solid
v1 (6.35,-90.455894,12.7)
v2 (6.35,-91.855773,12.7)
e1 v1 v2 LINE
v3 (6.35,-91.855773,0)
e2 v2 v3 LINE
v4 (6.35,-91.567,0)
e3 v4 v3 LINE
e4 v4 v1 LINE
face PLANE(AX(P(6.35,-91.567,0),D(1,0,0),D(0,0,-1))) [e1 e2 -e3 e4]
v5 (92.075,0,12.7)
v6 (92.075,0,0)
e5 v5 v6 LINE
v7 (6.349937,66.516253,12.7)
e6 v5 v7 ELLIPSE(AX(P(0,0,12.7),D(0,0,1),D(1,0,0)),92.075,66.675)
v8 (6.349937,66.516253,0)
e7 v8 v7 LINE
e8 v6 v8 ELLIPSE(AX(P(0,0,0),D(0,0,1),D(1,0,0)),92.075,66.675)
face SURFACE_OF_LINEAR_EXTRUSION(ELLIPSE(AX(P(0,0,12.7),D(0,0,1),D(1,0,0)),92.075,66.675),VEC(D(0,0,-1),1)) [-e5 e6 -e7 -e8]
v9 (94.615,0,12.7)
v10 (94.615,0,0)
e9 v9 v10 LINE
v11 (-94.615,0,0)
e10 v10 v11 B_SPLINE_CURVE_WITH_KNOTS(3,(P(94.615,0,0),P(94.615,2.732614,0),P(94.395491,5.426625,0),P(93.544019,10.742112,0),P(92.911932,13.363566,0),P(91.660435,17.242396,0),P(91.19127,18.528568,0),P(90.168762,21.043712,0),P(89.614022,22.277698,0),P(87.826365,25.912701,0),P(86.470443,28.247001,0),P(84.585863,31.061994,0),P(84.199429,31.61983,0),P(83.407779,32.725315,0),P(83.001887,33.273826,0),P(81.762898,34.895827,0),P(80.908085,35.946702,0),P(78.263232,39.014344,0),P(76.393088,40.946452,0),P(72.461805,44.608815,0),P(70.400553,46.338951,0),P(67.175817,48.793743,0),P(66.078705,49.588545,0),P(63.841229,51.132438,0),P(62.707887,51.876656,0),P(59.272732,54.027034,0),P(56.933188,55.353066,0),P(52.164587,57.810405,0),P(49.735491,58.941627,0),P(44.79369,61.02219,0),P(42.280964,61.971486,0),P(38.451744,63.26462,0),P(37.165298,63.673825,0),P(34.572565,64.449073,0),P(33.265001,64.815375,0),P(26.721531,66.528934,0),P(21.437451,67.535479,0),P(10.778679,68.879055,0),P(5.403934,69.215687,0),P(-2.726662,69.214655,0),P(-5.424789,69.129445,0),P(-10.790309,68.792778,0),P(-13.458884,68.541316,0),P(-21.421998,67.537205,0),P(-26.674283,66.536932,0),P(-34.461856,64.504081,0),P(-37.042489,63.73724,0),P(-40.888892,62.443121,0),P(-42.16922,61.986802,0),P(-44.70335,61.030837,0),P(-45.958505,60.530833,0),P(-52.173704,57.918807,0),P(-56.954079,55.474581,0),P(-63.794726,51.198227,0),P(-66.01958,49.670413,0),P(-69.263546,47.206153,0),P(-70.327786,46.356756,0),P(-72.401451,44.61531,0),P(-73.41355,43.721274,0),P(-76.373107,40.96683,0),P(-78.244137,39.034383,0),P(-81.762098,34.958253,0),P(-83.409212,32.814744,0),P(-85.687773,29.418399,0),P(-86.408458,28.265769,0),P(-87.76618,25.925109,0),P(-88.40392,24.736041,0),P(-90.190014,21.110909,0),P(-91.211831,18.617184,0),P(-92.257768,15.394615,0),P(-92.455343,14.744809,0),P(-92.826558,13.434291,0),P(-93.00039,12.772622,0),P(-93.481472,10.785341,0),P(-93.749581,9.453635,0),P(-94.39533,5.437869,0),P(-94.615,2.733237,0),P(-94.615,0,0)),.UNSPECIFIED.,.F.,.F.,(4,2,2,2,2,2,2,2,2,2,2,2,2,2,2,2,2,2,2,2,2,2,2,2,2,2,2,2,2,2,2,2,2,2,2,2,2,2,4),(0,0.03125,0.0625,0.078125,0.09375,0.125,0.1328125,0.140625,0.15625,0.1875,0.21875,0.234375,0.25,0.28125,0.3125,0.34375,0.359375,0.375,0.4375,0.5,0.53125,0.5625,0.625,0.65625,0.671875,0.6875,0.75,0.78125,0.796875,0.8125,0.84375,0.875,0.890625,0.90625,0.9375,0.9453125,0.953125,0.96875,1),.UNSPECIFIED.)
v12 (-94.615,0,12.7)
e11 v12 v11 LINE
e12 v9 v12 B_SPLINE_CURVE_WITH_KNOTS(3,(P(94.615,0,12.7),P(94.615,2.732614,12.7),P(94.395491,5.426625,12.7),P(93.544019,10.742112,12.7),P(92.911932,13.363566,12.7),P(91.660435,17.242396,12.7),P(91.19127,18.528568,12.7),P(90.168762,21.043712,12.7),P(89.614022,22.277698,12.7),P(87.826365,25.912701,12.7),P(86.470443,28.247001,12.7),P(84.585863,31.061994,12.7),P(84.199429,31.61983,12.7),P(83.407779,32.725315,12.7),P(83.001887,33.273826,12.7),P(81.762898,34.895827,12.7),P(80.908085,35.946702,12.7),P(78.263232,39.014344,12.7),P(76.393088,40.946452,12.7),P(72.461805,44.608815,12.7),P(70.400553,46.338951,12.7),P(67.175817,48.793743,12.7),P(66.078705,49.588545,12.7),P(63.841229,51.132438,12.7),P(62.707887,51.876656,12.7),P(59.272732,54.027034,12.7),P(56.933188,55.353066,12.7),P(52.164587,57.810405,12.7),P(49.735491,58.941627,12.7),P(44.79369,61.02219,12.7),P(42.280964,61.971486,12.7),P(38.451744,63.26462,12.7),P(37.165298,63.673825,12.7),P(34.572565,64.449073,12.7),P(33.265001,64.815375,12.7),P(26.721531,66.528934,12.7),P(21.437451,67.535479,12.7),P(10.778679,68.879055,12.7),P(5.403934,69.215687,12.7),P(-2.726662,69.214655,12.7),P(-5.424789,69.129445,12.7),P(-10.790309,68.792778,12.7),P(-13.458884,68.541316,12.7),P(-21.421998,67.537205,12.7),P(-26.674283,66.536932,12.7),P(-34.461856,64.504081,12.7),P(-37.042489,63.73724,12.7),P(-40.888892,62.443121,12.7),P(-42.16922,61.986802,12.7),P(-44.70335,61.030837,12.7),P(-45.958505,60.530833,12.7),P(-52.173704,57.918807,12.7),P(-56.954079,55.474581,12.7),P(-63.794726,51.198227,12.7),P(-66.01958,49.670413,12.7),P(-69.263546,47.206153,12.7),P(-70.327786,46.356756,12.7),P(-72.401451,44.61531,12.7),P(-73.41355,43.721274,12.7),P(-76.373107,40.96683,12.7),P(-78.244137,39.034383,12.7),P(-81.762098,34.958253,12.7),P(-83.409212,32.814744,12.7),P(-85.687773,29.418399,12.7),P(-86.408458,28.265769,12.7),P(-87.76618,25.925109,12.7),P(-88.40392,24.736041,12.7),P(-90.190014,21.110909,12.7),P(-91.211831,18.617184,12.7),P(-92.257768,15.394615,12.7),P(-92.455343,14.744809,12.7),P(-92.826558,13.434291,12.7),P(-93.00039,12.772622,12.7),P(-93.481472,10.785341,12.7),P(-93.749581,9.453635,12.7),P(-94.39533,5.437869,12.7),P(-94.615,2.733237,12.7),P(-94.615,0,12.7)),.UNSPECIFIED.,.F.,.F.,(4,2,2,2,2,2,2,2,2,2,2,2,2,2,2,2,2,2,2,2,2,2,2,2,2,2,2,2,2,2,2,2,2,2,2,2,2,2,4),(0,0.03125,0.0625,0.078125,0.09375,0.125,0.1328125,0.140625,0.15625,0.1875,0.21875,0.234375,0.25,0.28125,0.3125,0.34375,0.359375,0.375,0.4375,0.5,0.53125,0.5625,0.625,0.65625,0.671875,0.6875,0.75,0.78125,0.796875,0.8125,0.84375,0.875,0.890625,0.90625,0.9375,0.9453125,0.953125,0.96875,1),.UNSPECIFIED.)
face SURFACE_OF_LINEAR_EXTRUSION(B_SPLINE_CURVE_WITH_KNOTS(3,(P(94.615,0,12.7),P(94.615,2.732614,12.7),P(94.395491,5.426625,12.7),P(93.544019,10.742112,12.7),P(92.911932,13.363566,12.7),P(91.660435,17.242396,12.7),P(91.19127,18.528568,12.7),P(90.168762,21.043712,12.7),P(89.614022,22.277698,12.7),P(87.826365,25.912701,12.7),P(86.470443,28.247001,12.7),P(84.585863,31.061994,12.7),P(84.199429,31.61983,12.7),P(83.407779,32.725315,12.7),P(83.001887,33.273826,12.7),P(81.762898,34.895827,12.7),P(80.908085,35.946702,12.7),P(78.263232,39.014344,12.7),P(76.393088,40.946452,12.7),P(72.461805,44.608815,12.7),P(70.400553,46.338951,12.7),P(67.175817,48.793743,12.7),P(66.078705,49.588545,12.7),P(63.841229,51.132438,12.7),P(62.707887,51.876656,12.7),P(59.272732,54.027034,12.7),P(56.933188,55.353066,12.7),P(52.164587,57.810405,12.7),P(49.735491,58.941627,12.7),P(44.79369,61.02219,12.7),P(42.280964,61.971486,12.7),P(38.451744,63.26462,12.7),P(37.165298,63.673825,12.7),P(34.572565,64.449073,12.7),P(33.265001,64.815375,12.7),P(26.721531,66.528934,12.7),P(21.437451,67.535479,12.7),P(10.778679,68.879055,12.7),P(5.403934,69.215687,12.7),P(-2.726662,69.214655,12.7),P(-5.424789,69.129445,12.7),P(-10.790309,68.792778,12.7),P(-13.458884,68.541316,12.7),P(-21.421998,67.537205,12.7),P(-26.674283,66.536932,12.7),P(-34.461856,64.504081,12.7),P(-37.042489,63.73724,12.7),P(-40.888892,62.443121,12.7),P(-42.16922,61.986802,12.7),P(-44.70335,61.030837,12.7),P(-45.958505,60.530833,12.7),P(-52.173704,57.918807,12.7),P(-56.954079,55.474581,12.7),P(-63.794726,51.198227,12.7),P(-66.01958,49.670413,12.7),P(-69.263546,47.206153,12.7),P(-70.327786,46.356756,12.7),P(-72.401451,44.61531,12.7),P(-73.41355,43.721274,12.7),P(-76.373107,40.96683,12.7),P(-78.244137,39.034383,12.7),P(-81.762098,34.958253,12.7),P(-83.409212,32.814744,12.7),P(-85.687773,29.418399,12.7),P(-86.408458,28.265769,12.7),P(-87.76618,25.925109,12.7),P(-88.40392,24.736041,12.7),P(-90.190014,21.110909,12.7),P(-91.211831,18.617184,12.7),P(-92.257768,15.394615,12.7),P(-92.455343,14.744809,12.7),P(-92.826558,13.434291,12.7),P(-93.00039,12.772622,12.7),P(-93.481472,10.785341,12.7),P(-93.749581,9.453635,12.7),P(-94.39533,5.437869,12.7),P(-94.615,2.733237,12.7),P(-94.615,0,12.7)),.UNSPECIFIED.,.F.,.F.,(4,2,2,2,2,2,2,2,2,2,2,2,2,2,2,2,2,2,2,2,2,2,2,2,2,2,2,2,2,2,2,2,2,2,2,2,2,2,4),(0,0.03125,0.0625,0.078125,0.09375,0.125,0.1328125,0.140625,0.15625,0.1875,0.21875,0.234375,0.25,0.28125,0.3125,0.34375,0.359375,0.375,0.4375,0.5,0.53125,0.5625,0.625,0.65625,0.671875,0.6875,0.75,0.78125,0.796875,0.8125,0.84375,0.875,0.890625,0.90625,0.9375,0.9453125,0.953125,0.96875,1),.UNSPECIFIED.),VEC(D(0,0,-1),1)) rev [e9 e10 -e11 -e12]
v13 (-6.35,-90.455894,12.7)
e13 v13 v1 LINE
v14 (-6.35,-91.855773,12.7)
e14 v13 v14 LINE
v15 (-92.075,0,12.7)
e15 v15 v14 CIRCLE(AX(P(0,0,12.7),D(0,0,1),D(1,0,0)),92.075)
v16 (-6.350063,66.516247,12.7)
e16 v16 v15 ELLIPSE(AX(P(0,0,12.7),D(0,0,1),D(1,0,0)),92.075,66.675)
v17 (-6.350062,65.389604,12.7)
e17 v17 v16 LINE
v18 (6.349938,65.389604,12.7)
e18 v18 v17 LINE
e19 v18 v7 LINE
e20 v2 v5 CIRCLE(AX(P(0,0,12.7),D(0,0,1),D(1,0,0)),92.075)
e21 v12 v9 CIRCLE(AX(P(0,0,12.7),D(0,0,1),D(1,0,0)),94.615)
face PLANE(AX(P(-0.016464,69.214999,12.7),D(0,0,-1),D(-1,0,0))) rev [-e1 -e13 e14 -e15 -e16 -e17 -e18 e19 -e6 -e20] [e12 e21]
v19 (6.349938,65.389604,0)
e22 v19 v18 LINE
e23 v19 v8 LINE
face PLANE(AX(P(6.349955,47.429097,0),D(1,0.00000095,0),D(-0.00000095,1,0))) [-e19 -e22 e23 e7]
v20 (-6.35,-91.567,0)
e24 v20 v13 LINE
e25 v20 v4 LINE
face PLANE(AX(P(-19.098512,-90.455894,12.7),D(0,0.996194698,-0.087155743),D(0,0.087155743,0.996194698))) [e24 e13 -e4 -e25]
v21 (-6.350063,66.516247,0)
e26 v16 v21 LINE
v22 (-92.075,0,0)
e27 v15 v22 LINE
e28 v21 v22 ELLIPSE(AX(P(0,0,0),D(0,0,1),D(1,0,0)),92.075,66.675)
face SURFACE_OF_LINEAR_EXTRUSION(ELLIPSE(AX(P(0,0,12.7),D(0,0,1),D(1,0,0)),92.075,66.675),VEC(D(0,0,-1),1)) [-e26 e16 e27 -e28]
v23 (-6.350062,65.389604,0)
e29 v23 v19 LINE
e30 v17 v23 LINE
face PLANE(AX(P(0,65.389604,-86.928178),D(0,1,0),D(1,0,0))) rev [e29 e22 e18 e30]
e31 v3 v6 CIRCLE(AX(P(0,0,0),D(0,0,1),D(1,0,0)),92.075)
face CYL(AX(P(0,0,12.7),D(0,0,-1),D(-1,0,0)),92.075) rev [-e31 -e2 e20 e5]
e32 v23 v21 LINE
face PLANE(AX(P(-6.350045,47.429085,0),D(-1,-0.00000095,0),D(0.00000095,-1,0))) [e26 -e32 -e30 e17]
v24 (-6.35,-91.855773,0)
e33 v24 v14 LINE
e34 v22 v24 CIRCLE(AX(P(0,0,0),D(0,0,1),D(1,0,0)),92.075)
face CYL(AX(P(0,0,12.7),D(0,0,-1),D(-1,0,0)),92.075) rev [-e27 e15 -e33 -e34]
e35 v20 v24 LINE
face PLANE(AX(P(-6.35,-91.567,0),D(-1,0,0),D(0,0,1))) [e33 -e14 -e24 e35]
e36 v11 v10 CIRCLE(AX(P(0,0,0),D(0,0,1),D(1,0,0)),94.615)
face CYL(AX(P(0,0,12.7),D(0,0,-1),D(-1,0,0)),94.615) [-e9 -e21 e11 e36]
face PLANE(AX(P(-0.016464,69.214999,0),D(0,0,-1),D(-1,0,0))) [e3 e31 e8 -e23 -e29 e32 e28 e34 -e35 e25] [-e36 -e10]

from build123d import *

# Parameters (mm, degrees)
EXTRUDE_THIN4_DEPTH  = 12.7
BOSS_EXTRUDE4_START  = -1.285403
SKETCH9_W            = 12.7
SKETCH9_H            = 12.7
BOSS_EXTRUDE4_DEPTH  = 1.285403
SKETCH18_W           = 12.7
SKETCH18_H           = 12.7
BOSS_EXTRUDE11_DEPTH = 0.508
BOSS_EXTRUDE12_DEPTH = 12.7


# Read off the part's stored shape, not the designer's step: Extrude-Thin4
with BuildPart() as part:
    # Extrude-Thin4 outline → Extrude-Thin4 (new body)
    with BuildSketch(Plane.XY):
        with BuildLine():
            ThreePointArc((-94.615, 0), (0, -94.615), (94.615, 0))
            add(Edge.make_bspline(
                [(94.615, 0), (94.615, 2.73261432), (94.395490525, 5.426625193), (93.54401895, 10.742112058), (92.911931877, 13.363566074), (91.660435042, 17.242396406), (91.191270419, 18.528568166), (90.168762341, 21.043712381), (89.614022449, 22.277697693), (87.826365425, 25.912701016), (86.470442882, 28.247000696), (84.585863218, 31.06199447), (84.199428542, 31.619830243), (83.407778518, 32.725315123), (83.001887397, 33.273825859), (81.762898011, 34.895827175), (80.90808464, 35.946702496), (78.263231539, 39.014343992), (76.393087657, 40.946452093), (72.461804782, 44.60881511), (70.400552775, 46.338950587), (67.175816993, 48.793743065), (66.078704621, 49.588544685), (63.841229223, 51.13243847), (62.707886547, 51.876655554), (59.272732326, 54.027034208), (56.933188029, 55.353065789), (52.164586894, 57.810404839), (49.735490844, 58.941627007), (44.793689995, 61.022190247), (42.280964323, 61.97148591), (38.451744208, 63.264620094), (37.165298005, 63.673825065), (34.572564534, 64.449073075), (33.26500114, 64.81537478), (26.721531086, 66.528934319), (21.437450815, 67.535478954), (10.778679303, 68.879054675), (5.403934101, 69.215687043), (-2.726662378, 69.214654911), (-5.424789063, 69.129445108), (-10.790309058, 68.792778457), (-13.458884287, 68.541316332), (-21.421997842, 67.537204644), (-26.674282833, 66.536932479), (-34.461856375, 64.504081304), (-37.042489287, 63.737239618), (-40.888891672, 62.443121275), (-42.169219974, 61.986801748), (-44.70335009, 61.030836829), (-45.958505365, 60.530833267), (-52.173703529, 57.918806786), (-56.954079496, 55.474581033), (-63.79472601, 51.198227458), (-66.019580064, 49.670413346), (-69.263545781, 47.206152749), (-70.327786152, 46.356755825), (-72.401450601, 44.615309625), (-73.413550097, 43.721273672), (-76.37310693, 40.9668298), (-78.244137425, 39.034382611), (-81.76209758, 34.95825275), (-83.409211697, 32.814743947), (-85.687772675, 29.418399352), (-86.408457843, 28.265769226), (-87.766179903, 25.925109257), (-88.403920063, 24.736041385), (-90.190013765, 21.110908862), (-91.211831115, 18.617184418), (-92.257768409, 15.394614809), (-92.455342881, 14.744809102), (-92.826557707, 13.43429143), (-93.000389748, 12.772621628), (-93.481472485, 10.785340575), (-93.749581467, 9.453635256), (-94.395330303, 5.437869137), (-94.615, 2.733237345), (-94.615, 0)],
                knots=[0, 0, 0, 0, 0.03125, 0.03125, 0.0625, 0.0625, 0.078125, 0.078125, 0.09375, 0.09375, 0.125, 0.125, 0.1328125, 0.1328125, 0.140625, 0.140625, 0.15625, 0.15625, 0.1875, 0.1875, 0.21875, 0.21875, 0.234375, 0.234375, 0.25, 0.25, 0.28125, 0.28125, 0.3125, 0.3125, 0.34375, 0.34375, 0.359375, 0.359375, 0.375, 0.375, 0.4375, 0.4375, 0.5, 0.5, 0.53125, 0.53125, 0.5625, 0.5625, 0.625, 0.625, 0.65625, 0.65625, 0.671875, 0.671875, 0.6875, 0.6875, 0.75, 0.75, 0.78125, 0.78125, 0.796875, 0.796875, 0.8125, 0.8125, 0.84375, 0.84375, 0.875, 0.875, 0.890625, 0.890625, 0.90625, 0.90625, 0.9375, 0.9375, 0.9453125, 0.9453125, 0.953125, 0.953125, 0.96875, 0.96875, 1, 1, 1, 1], degree=3))
        make_face()
        with BuildLine():
            add(Edge.make_bspline(
                [(92.075, 0), (92.075, 66.675), (0, 66.675), (-92.075, 66.675), (-92.075, 0)],
                knots=[0, 0, 0, 1.570796327, 1.570796327, 3.141592654, 3.141592654, 3.141592654], degree=2, weights=[1, 0.707106781, 1, 0.707106781, 1]))
            ThreePointArc((92.075, 0), (0, -92.075), (-92.075, 0))
        make_face(mode=Mode.SUBTRACT)
    extrude(amount=EXTRUDE_THIN4_DEPTH)

    # Sketch9 → Boss-Extrude4 (add)
    with BuildSketch(Plane(origin=(-6.3332e-05, 66.675, 0), x_dir=(0.999999999999549, 9.498577862699883e-07, 0), z_dir=(-9.498577862699883e-07, 0.999999999999549, 0)).offset(BOSS_EXTRUDE4_START)):
        with Locations((0, -6.35)):
            Rectangle(SKETCH9_W, SKETCH9_H)
    extrude(amount=BOSS_EXTRUDE4_DEPTH)

    # Sketch18 → Boss-Extrude11 (add)
    with BuildSketch(Plane(origin=(0, -92.075, 0), x_dir=(-1, 0, 0), z_dir=(0, -1, 0))):
        with Locations((0, -6.35)):
            Rectangle(SKETCH18_W, SKETCH18_H)
    extrude(amount=-BOSS_EXTRUDE11_DEPTH)

    # Sketch19 → Boss-Extrude12 (add)
    with BuildSketch(Plane(origin=(6.35, 0, 0), x_dir=(0, 0, -1), z_dir=(1, 0, 0))):
        Polygon((-12.7, -91.567), (-12.7, -90.455893973), (0, -91.567), align=None)
    extrude(amount=-BOSS_EXTRUDE12_DEPTH)


solid = part.part
